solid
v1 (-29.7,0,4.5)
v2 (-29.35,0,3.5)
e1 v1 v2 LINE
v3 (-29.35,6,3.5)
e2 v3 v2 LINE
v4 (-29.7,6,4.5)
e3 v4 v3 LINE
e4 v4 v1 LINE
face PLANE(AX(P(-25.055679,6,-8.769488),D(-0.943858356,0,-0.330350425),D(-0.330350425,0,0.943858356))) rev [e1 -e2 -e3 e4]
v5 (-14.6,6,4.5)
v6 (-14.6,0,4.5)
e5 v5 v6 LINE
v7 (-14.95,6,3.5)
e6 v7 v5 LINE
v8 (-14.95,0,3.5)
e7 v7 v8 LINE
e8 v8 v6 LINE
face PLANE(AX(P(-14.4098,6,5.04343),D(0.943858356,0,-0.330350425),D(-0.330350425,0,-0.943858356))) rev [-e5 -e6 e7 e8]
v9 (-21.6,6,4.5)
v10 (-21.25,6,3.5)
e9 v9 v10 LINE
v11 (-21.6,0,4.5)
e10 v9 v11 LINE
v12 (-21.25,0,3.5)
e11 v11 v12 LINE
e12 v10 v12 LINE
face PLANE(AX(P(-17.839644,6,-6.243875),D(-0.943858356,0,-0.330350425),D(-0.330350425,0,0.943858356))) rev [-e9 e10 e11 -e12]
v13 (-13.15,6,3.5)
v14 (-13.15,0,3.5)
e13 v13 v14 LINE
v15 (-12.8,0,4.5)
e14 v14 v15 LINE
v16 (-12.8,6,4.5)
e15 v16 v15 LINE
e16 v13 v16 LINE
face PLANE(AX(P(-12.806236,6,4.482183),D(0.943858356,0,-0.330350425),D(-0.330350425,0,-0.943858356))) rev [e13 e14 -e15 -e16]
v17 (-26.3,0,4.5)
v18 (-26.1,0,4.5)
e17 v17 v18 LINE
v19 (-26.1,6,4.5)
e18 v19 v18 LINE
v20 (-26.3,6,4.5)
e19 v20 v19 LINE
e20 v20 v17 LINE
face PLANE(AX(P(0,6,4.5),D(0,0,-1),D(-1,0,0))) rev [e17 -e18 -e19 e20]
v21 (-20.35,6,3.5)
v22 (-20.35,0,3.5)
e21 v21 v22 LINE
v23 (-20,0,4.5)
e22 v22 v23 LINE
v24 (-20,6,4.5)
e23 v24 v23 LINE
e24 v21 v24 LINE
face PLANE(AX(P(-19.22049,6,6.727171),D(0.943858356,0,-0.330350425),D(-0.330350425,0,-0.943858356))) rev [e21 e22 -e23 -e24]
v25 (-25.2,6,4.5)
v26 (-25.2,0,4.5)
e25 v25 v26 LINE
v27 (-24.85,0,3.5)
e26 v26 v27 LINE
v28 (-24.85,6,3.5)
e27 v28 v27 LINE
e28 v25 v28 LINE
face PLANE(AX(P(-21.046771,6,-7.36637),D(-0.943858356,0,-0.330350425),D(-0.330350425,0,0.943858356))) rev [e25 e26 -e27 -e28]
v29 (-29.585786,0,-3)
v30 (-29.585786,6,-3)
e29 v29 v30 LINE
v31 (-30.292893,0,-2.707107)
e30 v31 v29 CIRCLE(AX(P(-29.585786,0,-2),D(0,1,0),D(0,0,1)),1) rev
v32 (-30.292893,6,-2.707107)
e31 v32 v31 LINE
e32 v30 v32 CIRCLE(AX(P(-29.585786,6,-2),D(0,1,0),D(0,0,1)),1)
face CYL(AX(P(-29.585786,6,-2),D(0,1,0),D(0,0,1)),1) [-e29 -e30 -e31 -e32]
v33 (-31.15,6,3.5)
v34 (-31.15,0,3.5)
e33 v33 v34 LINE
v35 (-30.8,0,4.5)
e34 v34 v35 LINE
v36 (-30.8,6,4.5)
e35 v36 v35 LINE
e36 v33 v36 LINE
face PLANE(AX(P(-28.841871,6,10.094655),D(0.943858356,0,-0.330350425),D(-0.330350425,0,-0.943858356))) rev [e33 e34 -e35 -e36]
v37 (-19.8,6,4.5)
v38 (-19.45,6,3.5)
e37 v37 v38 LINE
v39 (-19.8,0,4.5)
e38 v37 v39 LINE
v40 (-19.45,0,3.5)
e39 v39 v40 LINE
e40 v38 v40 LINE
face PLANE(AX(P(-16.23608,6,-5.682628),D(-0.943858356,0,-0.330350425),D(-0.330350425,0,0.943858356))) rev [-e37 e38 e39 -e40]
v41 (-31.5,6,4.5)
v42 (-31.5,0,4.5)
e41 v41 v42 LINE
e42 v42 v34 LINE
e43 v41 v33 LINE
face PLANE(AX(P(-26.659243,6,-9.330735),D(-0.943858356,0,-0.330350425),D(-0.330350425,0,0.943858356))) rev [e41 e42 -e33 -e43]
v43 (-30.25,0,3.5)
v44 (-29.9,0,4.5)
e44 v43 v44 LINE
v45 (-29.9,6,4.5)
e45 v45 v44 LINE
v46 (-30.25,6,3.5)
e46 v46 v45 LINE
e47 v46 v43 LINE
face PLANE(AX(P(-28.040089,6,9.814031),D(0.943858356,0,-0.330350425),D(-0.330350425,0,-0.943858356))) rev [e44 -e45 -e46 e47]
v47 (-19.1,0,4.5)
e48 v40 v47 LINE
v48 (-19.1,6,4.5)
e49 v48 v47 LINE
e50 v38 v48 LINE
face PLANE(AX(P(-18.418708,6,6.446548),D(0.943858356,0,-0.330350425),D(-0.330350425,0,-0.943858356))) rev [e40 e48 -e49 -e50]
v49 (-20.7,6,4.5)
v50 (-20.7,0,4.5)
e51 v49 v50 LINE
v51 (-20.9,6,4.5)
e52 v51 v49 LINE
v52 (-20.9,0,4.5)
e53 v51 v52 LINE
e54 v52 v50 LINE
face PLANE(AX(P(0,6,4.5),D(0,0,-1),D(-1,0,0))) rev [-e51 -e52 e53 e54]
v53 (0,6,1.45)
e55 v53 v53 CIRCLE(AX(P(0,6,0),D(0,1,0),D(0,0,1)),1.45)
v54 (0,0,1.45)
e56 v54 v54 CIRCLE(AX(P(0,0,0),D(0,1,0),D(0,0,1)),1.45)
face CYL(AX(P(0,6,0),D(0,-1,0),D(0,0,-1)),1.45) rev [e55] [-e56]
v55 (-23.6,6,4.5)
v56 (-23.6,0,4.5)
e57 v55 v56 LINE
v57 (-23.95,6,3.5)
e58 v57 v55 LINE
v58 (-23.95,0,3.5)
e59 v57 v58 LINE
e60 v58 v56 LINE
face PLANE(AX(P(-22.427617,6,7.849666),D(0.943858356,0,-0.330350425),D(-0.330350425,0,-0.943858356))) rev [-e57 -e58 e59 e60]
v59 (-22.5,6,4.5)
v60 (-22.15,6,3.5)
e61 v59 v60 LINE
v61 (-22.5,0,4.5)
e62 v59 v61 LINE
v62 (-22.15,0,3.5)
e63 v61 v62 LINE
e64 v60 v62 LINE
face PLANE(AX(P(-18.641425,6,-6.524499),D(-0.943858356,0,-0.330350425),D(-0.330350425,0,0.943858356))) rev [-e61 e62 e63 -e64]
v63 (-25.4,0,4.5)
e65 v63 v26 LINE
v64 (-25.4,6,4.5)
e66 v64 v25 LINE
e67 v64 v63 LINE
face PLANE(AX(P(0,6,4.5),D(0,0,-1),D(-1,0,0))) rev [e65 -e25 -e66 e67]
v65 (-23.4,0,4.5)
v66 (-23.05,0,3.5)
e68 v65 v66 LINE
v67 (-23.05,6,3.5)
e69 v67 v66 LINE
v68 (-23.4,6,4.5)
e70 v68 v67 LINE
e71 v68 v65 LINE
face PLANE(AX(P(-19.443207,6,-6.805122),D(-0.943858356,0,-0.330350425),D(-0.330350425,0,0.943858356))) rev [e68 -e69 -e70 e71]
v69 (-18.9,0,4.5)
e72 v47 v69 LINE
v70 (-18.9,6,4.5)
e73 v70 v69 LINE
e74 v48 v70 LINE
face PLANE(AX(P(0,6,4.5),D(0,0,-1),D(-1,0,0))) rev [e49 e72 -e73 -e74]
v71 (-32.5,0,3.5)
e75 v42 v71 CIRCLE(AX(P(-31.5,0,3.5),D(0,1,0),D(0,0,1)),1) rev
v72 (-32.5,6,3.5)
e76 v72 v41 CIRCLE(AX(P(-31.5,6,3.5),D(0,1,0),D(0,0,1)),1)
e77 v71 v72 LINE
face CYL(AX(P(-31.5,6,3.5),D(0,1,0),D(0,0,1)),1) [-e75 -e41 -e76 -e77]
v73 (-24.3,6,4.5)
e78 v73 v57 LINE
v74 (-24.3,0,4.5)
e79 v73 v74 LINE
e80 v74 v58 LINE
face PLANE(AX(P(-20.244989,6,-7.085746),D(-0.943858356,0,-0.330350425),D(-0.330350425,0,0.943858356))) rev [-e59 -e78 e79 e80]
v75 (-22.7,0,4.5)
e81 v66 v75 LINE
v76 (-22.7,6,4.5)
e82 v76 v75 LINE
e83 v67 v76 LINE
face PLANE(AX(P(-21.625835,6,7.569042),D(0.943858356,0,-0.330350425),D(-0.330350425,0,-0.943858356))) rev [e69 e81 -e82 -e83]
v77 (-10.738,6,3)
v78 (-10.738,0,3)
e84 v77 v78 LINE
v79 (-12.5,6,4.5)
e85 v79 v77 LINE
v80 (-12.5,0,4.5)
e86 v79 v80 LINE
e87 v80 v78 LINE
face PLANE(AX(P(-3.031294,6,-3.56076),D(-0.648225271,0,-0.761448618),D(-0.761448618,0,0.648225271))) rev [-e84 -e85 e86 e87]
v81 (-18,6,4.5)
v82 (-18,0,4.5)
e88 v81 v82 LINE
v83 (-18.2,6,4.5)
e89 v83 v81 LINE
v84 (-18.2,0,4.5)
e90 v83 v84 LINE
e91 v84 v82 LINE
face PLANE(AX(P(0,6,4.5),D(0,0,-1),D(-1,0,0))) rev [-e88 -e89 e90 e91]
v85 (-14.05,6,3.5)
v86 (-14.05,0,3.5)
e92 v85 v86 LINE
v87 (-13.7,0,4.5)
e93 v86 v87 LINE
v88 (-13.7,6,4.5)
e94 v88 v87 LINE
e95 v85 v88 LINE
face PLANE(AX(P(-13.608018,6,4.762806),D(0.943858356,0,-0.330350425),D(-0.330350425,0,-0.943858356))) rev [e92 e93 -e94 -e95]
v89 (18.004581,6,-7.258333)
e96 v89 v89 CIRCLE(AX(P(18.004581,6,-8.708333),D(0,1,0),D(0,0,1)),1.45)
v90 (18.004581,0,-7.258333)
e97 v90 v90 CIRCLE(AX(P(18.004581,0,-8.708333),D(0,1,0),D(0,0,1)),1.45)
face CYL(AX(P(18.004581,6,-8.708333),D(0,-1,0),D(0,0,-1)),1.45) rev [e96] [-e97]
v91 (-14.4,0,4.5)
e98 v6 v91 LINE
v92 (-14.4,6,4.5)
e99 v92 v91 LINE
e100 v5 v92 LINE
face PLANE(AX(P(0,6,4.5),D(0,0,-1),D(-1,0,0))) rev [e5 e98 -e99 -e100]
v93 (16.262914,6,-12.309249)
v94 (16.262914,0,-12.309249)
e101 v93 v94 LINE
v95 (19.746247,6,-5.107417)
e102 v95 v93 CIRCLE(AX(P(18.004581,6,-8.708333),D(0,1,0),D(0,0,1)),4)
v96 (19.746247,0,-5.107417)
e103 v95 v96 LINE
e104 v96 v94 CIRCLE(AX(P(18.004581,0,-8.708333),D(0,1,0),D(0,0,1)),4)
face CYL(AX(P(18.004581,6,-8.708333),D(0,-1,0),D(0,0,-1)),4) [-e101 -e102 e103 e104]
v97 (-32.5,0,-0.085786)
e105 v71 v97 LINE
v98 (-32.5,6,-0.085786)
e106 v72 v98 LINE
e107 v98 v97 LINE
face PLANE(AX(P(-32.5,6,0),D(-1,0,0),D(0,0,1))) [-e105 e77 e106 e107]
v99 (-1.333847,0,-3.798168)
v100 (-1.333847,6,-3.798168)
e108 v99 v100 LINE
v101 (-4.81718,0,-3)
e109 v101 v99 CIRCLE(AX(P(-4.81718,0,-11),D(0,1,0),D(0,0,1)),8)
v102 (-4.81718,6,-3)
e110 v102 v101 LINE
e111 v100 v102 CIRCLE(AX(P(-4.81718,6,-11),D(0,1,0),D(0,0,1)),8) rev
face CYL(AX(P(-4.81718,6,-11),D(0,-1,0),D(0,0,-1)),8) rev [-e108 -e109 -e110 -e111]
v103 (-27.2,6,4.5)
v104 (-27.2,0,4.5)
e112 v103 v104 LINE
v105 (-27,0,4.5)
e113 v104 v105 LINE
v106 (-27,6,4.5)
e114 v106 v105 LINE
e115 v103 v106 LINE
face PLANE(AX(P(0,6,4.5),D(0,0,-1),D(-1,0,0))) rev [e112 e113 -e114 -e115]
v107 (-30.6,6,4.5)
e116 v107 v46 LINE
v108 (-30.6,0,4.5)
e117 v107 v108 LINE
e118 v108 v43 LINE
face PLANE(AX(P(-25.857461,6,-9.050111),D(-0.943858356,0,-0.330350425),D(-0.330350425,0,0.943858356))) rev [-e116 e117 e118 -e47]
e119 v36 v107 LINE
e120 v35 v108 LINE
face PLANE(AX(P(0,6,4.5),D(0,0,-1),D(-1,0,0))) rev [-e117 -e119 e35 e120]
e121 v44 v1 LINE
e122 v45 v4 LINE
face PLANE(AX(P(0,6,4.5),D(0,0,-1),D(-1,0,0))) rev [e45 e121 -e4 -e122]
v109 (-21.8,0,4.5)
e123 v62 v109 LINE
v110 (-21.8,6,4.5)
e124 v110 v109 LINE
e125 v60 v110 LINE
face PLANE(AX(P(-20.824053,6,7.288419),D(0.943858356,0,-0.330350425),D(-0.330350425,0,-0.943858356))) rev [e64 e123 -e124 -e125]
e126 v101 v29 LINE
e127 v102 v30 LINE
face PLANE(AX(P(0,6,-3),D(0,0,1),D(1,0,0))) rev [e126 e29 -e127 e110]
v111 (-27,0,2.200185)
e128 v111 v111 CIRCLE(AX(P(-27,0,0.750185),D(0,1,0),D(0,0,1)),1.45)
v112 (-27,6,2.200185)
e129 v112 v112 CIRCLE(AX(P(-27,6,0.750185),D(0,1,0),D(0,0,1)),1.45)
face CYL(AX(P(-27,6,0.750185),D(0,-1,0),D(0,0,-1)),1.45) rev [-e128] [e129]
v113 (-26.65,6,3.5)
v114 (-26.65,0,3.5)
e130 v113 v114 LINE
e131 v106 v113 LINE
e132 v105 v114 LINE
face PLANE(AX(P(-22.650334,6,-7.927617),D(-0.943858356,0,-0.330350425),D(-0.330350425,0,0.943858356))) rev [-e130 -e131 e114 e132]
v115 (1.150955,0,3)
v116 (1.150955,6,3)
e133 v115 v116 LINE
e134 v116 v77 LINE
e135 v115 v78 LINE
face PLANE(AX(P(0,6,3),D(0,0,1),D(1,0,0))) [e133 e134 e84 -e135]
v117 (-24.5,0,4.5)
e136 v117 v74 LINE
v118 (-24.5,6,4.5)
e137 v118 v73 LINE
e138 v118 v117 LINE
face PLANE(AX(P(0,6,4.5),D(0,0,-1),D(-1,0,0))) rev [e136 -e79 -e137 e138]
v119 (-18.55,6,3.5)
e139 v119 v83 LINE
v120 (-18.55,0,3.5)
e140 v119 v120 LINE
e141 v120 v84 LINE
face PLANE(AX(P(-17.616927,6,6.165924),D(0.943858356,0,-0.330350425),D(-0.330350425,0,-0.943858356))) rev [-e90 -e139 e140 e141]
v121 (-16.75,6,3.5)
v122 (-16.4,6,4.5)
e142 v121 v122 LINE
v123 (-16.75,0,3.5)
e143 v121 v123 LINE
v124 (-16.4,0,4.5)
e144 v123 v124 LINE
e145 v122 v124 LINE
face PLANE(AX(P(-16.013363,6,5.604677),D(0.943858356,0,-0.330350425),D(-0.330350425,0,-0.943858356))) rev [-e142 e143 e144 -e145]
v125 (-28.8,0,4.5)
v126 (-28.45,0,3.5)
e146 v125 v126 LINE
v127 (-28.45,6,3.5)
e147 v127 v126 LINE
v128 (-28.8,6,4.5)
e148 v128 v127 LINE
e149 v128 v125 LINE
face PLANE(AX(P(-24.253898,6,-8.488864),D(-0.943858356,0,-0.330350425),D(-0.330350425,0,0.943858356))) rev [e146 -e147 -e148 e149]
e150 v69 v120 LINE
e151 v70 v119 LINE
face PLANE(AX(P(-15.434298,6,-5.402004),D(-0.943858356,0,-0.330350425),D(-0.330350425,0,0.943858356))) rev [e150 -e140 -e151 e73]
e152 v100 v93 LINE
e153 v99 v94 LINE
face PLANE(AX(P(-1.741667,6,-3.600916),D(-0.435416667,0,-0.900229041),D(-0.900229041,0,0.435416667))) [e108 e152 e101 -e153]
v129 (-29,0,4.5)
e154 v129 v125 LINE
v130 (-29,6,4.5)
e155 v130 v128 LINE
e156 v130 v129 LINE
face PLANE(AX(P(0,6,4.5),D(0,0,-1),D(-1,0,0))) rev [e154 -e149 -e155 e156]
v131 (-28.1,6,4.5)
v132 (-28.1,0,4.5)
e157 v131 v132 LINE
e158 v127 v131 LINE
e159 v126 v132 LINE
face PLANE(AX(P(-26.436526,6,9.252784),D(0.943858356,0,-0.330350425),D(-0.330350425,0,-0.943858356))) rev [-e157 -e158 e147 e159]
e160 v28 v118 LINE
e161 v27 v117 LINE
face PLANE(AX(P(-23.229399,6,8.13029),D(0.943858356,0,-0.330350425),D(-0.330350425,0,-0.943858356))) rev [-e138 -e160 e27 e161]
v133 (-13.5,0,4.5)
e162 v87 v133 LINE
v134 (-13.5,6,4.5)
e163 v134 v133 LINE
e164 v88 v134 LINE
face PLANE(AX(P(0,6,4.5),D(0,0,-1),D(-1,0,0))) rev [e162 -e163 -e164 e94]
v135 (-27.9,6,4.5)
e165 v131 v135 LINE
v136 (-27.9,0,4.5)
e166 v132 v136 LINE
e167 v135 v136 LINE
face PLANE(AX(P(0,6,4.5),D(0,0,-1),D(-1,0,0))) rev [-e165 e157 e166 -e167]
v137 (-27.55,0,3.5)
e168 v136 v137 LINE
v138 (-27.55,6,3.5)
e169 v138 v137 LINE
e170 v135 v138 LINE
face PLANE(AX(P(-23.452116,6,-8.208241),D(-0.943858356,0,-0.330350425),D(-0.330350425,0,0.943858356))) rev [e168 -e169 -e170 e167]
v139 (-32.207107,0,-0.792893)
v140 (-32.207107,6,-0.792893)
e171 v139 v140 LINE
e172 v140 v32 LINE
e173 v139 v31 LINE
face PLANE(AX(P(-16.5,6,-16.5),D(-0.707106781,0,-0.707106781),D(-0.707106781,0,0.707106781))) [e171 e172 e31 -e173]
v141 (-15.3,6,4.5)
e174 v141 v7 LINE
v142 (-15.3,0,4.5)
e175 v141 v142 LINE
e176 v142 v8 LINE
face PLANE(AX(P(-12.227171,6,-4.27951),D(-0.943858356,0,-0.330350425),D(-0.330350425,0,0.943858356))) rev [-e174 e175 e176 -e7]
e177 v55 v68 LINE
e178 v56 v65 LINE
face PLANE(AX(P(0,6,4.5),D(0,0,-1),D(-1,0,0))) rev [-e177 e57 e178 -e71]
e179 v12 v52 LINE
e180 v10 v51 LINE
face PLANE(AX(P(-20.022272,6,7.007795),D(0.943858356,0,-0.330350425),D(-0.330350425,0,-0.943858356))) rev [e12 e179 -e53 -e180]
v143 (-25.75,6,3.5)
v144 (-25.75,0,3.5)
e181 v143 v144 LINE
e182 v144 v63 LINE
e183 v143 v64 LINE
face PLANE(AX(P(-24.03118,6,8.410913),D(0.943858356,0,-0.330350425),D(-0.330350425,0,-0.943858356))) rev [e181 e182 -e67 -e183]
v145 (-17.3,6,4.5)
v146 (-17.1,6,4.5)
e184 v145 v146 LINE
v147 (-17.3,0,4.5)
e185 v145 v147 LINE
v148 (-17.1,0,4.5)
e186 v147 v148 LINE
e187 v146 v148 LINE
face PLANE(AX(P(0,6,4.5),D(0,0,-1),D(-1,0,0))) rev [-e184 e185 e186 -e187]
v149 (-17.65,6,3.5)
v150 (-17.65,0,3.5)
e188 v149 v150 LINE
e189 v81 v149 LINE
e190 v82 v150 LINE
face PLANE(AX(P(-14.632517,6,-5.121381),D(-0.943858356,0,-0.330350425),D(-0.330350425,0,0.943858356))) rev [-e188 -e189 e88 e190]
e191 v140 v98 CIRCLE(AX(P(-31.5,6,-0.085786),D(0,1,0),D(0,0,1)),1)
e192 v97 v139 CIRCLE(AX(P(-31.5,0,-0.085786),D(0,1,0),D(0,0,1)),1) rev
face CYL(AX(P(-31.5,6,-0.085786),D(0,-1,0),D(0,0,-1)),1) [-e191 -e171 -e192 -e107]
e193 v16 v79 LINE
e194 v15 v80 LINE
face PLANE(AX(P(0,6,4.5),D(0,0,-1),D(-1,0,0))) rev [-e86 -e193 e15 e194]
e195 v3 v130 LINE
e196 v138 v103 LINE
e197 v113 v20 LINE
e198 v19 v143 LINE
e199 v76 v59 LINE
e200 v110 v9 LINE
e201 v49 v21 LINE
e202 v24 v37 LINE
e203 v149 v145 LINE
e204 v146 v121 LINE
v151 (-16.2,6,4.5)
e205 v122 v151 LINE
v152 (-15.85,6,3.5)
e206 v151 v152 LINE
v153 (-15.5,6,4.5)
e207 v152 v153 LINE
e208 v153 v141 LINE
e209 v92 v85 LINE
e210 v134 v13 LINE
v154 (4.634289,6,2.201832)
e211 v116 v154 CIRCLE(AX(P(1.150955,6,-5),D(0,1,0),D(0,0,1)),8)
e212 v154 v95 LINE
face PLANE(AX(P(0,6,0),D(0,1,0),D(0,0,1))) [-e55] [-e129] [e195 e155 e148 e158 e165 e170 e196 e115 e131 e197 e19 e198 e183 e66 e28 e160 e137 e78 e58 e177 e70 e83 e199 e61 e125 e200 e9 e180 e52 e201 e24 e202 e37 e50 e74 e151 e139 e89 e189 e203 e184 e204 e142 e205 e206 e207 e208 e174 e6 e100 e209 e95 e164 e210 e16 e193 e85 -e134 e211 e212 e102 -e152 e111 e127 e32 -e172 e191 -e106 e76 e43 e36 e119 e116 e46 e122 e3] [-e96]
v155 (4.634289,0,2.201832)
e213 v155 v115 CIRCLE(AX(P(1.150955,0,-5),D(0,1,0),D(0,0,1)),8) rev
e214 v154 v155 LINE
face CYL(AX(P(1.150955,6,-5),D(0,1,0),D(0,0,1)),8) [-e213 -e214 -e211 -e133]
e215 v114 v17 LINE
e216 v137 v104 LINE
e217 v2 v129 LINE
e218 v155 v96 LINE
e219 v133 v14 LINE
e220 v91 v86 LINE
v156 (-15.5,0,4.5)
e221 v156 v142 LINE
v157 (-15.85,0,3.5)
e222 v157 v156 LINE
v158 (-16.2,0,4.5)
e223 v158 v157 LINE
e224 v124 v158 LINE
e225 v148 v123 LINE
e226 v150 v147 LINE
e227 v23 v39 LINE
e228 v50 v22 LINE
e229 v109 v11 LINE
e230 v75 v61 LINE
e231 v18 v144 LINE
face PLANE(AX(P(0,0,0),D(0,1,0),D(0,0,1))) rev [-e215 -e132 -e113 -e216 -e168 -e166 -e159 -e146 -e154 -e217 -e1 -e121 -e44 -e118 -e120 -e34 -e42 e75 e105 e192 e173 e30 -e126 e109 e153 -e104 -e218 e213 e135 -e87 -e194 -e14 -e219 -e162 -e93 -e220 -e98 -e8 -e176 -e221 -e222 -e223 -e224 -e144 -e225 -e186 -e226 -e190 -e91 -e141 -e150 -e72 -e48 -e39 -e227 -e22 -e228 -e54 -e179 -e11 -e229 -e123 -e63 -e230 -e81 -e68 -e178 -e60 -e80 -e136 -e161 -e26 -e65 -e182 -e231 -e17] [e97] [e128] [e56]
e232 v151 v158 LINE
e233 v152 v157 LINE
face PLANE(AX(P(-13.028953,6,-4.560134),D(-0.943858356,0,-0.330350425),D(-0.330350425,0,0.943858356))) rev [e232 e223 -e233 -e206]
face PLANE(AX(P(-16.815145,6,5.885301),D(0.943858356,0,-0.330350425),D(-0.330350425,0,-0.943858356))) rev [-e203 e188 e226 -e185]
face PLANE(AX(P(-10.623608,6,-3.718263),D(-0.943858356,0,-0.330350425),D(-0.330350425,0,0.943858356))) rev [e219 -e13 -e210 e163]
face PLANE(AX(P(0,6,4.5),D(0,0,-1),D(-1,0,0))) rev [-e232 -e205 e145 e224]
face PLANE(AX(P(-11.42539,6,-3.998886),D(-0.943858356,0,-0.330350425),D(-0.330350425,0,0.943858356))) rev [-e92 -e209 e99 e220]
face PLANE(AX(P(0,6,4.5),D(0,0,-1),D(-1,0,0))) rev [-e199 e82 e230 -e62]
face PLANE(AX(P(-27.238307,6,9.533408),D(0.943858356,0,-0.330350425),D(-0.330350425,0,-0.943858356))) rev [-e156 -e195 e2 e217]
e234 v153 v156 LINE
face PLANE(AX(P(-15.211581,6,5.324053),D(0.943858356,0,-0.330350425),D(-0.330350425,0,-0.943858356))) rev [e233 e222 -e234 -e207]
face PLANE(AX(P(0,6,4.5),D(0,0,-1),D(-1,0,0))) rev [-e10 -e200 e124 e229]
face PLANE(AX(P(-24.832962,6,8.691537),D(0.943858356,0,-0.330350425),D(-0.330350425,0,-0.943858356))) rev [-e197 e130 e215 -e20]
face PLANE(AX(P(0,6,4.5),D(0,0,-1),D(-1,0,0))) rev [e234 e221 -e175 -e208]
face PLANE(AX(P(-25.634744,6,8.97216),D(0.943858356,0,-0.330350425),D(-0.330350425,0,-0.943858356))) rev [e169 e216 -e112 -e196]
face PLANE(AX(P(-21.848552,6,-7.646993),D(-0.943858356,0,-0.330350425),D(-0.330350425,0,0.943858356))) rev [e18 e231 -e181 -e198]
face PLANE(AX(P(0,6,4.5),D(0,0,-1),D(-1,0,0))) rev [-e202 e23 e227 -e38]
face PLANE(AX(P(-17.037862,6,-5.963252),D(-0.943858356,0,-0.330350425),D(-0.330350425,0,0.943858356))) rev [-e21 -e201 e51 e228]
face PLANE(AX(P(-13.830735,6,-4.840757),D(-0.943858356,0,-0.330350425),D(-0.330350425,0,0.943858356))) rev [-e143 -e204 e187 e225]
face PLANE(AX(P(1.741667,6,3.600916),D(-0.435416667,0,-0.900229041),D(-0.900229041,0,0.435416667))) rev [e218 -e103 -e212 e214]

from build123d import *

# Parameters (mm, degrees)
CROQUIS_BASE_R          = 1.45
SALIENTE_EXTRUIR1_DEPTH = 6
REDONDEO1_R             = 1
REDONDEO2_R             = 8


with BuildPart() as part:
    # Croquis base → Saliente-Extruir1 (new body)
    with BuildSketch(Plane(origin=(0, 0, 0), x_dir=(1, 0, 0), z_dir=(0, 1, 0))):
        with BuildLine():
            Line((2.984067851, -3), (-10.738, -3))
            Line((-10.738, -3), (-12.5, -4.5))
            Line((-12.5, -4.5), (-12.6, -4.5))
            Line((-12.6, -4.5), (-12.8, -4.5))
            Line((-12.8, -4.5), (-13.15, -3.5))
            Line((-13.15, -3.5), (-13.5, -4.5))
            Line((-13.5, -4.5), (-13.7, -4.5))
            Line((-13.7, -4.5), (-14.05, -3.5))
            Line((-14.05, -3.5), (-14.4, -4.5))
            Line((-14.4, -4.5), (-14.6, -4.5))
            Line((-14.6, -4.5), (-14.95, -3.5))
            Line((-14.95, -3.5), (-15.3, -4.5))
            Line((-15.3, -4.5), (-15.5, -4.5))
            Line((-15.5, -4.5), (-15.85, -3.5))
            Line((-15.85, -3.5), (-16.2, -4.5))
            Line((-16.2, -4.5), (-16.4, -4.5))
            Line((-16.4, -4.5), (-16.75, -3.5))
            Line((-16.75, -3.5), (-17.1, -4.5))
            Line((-17.1, -4.5), (-17.3, -4.5))
            Line((-17.3, -4.5), (-17.65, -3.5))
            Line((-17.65, -3.5), (-18, -4.5))
            Line((-18, -4.5), (-18.2, -4.5))
            Line((-18.2, -4.5), (-18.55, -3.5))
            Line((-18.55, -3.5), (-18.9, -4.5))
            Line((-18.9, -4.5), (-19.1, -4.5))
            Line((-19.1, -4.5), (-19.45, -3.5))
            Line((-19.45, -3.5), (-19.8, -4.5))
            Line((-19.8, -4.5), (-20, -4.5))
            Line((-20, -4.5), (-20.35, -3.5))
            Line((-20.35, -3.5), (-20.7, -4.5))
            Line((-20.7, -4.5), (-20.9, -4.5))
            Line((-20.9, -4.5), (-21.25, -3.5))
            Line((-21.25, -3.5), (-21.6, -4.5))
            Line((-21.6, -4.5), (-21.8, -4.5))
            Line((-21.8, -4.5), (-22.15, -3.5))
            Line((-22.15, -3.5), (-22.5, -4.5))
            Line((-22.5, -4.5), (-22.7, -4.5))
            Line((-22.7, -4.5), (-23.05, -3.5))
            Line((-23.05, -3.5), (-23.4, -4.5))
            Line((-23.4, -4.5), (-23.6, -4.5))
            Line((-23.6, -4.5), (-23.95, -3.5))
            Line((-23.95, -3.5), (-24.3, -4.5))
            Line((-24.3, -4.5), (-24.5, -4.5))
            Line((-24.5, -4.5), (-24.85, -3.5))
            Line((-24.85, -3.5), (-25.2, -4.5))
            Line((-25.2, -4.5), (-25.4, -4.5))
            Line((-25.4, -4.5), (-25.75, -3.5))
            Line((-25.75, -3.5), (-26.1, -4.5))
            Line((-26.1, -4.5), (-26.3, -4.5))
            Line((-26.3, -4.5), (-26.65, -3.5))
            Line((-26.65, -3.5), (-27, -4.5))
            Line((-27, -4.5), (-27.2, -4.5))
            Line((-27.2, -4.5), (-27.55, -3.5))
            Line((-27.55, -3.5), (-27.9, -4.5))
            Line((-27.9, -4.5), (-28.1, -4.5))
            Line((-28.1, -4.5), (-28.45, -3.5))
            Line((-28.45, -3.5), (-28.8, -4.5))
            Line((-28.8, -4.5), (-29, -4.5))
            Line((-29, -4.5), (-29.35, -3.5))
            Line((-29.35, -3.5), (-29.7, -4.5))
            Line((-29.7, -4.5), (-29.9, -4.5))
            Line((-29.9, -4.5), (-30.25, -3.5))
            Line((-30.25, -3.5), (-30.6, -4.5))
            Line((-30.6, -4.5), (-30.8, -4.5))
            Line((-30.8, -4.5), (-31.15, -3.5))
            Line((-31.15, -3.5), (-31.5, -4.5))
            Line((-31.5, -4.5), (-32.5, -4.5))
            Line((-32.5, -4.5), (-32.5, -3))
            Line((-32.5, -3), (-32.5, 0.5))
            Line((-32.5, 0.5), (-30, 3))
            Line((-30, 3), (-2.984067851, 3))
            Line((-2.984067851, 3), (16.262914155, 12.309249498))
            ThreePointArc((16.262914155, 12.309249498), (21.605496986, 10.45), (19.746247488, 5.107417169))
            Line((19.746247488, 5.107417169), (2.984067851, -3))
        make_face()
        with Locations(Location((-27, -0.750184615, 0), (0, 0, 270))):
            Circle(CROQUIS_BASE_R, mode=Mode.SUBTRACT)
        with Locations(Location((0, 0, 0), (0, 0, 270))):
            Circle(CROQUIS_BASE_R, mode=Mode.SUBTRACT)
        with Locations(Location((18.004580821, 8.708333333, 0), (0, 0, 270))):
            Circle(CROQUIS_BASE_R, mode=Mode.SUBTRACT)
    extrude(amount=SALIENTE_EXTRUIR1_DEPTH)

    # Redondeo1
    redondeo1_edges = [part.edges().sort_by_distance(p)[0] for p in [
        (-30, 3, -3),
        (-32.5, 3, -0.5),
        (-32.5, 3, 4.5),
    ]]
    fillet(redondeo1_edges, radius=REDONDEO1_R - 0.0001)  # a hair under: the kernel refuses the full size

    # Redondeo2
    redondeo2_edges = [part.edges().sort_by_distance(p)[0] for p in [
        (2.984067851, 3, 3),
        (-2.984067851, 3, -3),
    ]]
    fillet(redondeo2_edges, radius=REDONDEO2_R)


solid = part.part
